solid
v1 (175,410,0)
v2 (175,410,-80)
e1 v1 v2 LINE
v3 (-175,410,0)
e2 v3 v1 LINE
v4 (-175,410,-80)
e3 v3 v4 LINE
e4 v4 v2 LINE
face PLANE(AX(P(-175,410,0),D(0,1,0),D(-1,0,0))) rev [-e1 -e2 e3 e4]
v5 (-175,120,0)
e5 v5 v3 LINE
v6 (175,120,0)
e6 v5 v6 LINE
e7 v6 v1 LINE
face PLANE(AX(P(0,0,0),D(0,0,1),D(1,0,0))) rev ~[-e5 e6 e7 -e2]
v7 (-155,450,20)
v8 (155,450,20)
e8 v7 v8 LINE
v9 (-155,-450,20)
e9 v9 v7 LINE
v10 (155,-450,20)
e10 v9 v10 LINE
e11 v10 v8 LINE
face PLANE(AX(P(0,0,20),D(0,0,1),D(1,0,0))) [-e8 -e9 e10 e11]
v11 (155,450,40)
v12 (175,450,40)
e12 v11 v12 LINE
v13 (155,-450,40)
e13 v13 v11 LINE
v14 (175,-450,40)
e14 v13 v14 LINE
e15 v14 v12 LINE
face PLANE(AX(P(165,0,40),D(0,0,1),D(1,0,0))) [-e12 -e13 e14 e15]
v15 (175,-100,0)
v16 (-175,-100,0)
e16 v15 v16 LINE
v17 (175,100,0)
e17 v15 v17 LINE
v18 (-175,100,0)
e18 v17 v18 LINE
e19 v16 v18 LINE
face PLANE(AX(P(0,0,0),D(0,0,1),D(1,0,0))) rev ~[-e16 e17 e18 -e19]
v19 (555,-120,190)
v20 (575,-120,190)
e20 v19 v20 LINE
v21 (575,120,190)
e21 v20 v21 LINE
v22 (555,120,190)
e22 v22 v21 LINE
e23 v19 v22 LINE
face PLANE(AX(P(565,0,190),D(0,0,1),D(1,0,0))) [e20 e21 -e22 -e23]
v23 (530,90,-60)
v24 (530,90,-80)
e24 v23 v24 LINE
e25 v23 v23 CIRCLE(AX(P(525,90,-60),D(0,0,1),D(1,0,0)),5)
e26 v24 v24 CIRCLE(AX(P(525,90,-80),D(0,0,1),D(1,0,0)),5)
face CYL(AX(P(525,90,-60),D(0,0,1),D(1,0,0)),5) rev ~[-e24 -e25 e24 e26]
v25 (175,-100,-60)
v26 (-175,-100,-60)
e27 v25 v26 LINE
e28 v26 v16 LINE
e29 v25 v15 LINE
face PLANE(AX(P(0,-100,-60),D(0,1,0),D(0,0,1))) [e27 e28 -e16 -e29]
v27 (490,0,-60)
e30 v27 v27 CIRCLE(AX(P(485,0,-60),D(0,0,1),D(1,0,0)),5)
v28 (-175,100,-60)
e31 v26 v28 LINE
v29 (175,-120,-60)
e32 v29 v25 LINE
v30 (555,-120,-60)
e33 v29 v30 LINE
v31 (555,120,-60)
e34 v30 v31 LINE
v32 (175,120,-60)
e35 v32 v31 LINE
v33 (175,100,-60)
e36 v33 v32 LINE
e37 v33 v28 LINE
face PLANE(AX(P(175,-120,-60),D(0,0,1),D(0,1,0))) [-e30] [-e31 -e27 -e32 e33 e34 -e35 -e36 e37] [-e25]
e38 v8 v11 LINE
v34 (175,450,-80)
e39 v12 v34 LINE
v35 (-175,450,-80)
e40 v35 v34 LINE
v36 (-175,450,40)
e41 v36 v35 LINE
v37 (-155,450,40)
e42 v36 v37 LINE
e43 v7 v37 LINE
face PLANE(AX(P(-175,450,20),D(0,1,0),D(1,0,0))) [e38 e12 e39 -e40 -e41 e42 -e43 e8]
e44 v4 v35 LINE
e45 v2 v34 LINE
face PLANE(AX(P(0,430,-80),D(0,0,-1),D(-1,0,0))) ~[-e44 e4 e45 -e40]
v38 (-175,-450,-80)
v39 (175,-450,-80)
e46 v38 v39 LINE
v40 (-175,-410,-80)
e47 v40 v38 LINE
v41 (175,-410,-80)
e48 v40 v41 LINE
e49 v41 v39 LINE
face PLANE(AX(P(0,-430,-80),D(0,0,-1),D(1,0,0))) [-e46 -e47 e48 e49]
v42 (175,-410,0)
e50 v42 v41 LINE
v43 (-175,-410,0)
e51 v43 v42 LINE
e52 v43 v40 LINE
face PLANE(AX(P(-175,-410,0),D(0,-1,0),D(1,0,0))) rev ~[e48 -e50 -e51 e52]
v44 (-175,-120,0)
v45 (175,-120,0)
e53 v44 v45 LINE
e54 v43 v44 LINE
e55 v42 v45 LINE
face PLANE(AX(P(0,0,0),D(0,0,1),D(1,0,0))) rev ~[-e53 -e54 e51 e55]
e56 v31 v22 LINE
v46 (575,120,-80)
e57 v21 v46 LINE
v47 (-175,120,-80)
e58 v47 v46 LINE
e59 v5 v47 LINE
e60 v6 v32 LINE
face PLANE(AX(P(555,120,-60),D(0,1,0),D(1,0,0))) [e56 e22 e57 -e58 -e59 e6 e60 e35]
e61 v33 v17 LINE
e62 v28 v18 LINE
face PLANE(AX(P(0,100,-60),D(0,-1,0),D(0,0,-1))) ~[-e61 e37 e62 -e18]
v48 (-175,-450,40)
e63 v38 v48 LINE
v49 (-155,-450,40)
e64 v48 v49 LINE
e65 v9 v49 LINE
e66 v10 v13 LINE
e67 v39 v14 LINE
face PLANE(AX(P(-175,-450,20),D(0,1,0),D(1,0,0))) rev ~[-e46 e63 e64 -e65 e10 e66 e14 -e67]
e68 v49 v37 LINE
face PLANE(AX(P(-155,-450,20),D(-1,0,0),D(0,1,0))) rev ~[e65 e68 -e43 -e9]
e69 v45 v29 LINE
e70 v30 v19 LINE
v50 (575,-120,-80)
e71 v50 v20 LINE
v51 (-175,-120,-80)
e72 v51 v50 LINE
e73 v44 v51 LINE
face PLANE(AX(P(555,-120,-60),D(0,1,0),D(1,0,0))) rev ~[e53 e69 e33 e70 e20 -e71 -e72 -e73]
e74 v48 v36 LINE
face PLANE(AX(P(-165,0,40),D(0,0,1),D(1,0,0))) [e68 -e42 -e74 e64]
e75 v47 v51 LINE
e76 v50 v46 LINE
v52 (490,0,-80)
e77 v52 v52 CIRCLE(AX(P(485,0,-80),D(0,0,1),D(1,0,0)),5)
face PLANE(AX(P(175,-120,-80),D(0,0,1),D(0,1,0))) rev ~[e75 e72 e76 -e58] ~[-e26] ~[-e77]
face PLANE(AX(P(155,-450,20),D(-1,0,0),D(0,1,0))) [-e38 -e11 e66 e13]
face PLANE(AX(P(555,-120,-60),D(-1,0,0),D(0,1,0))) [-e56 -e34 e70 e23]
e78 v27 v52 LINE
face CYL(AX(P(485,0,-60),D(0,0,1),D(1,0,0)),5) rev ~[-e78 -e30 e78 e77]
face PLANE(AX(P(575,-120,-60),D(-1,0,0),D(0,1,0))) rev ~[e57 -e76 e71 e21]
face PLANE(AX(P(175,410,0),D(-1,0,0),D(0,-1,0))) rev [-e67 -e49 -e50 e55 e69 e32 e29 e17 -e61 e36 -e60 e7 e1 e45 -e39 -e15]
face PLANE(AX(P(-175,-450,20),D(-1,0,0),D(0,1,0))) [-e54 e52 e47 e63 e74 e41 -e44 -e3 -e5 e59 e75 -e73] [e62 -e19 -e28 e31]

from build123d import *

# Parameters (mm, degrees)
F0_W      = 350
F0_H      = 900
F1_DEPTH  = 20
F2_W      = 100
F2_H      = 20
F3_DEPTH  = 175
F4_W      = 350
F4_H      = 40
F5_DEPTH  = 80
F6_W      = 20
F6_H      = 900
F7_DEPTH  = 20
F8_W      = 240
F8_H      = 20
F9_DEPTH  = 400
F10_W     = 20
F10_H     = 240
F11_DEPTH = 250
F12_R     = 5
F13_DEPTH = 20.001


# Not quite as in the source:
# - a pattern or mirror of a feature is missing from the dataset's text; its kind, count and spacing are read off the source's solid


with BuildPart() as f1:
    # F0 (on Top) → F1 (new body)
    with BuildSketch(Plane.XY):
        Rectangle(F0_W, F0_H)
    extrude(amount=F1_DEPTH)

    # F2 (on Right) → F3 (join, symmetric)
    with BuildSketch(Plane.YZ):
        Polygon((-100, 0), (-120, 0), (-120, -80), (-100, -80), (-100, -60), align=None)
        with Locations((-50, -70)):
            Rectangle(F2_W, F2_H)
    f3 = extrude(amount=F3_DEPTH, both=True)

    # F3_copies: F3 across plane
    add(f3.mirror(Plane.ZX))

    # F4 (on face) → F5 (join)
    with BuildSketch(Plane(origin=(0, 0, 0), x_dir=(1, 0, 0), z_dir=(0, 0, -1))):
        with Locations((0, 430)):
            Rectangle(F4_W, F4_H)
    f5 = extrude(amount=F5_DEPTH)

    # F5_copies: F5 across plane
    add(f5.mirror(Plane.ZX))

    # F6 (on face) → F7 (join)
    with BuildSketch(Plane.XY.offset(20)):
        with Locations((-165, 0)):
            Rectangle(F6_W, F6_H)
        with Locations((165, 0)):
            Rectangle(F6_W, F6_H)
    extrude(amount=F7_DEPTH)

    # F8 (on face) → F9 (join)
    with BuildSketch(Plane.YZ.offset(175)):
        with Locations((0, -70)):
            Rectangle(F8_W, F8_H)
    extrude(amount=F9_DEPTH)

    # F10 (on face) → F11 (join)
    with BuildSketch(Plane.XY.offset(-60)):
        with Locations((565, 0)):
            Rectangle(F10_W, F10_H)
    extrude(amount=F11_DEPTH)

    # F12 (on face) → F13 (cut, through all)
    with BuildSketch(Plane.XY.offset(-60)):
        with Locations((525, 90)):
            Circle(F12_R)
        with Locations((485, 0)):
            Circle(F12_R)
    extrude(amount=-F13_DEPTH, mode=Mode.SUBTRACT)


solid = f1.part
